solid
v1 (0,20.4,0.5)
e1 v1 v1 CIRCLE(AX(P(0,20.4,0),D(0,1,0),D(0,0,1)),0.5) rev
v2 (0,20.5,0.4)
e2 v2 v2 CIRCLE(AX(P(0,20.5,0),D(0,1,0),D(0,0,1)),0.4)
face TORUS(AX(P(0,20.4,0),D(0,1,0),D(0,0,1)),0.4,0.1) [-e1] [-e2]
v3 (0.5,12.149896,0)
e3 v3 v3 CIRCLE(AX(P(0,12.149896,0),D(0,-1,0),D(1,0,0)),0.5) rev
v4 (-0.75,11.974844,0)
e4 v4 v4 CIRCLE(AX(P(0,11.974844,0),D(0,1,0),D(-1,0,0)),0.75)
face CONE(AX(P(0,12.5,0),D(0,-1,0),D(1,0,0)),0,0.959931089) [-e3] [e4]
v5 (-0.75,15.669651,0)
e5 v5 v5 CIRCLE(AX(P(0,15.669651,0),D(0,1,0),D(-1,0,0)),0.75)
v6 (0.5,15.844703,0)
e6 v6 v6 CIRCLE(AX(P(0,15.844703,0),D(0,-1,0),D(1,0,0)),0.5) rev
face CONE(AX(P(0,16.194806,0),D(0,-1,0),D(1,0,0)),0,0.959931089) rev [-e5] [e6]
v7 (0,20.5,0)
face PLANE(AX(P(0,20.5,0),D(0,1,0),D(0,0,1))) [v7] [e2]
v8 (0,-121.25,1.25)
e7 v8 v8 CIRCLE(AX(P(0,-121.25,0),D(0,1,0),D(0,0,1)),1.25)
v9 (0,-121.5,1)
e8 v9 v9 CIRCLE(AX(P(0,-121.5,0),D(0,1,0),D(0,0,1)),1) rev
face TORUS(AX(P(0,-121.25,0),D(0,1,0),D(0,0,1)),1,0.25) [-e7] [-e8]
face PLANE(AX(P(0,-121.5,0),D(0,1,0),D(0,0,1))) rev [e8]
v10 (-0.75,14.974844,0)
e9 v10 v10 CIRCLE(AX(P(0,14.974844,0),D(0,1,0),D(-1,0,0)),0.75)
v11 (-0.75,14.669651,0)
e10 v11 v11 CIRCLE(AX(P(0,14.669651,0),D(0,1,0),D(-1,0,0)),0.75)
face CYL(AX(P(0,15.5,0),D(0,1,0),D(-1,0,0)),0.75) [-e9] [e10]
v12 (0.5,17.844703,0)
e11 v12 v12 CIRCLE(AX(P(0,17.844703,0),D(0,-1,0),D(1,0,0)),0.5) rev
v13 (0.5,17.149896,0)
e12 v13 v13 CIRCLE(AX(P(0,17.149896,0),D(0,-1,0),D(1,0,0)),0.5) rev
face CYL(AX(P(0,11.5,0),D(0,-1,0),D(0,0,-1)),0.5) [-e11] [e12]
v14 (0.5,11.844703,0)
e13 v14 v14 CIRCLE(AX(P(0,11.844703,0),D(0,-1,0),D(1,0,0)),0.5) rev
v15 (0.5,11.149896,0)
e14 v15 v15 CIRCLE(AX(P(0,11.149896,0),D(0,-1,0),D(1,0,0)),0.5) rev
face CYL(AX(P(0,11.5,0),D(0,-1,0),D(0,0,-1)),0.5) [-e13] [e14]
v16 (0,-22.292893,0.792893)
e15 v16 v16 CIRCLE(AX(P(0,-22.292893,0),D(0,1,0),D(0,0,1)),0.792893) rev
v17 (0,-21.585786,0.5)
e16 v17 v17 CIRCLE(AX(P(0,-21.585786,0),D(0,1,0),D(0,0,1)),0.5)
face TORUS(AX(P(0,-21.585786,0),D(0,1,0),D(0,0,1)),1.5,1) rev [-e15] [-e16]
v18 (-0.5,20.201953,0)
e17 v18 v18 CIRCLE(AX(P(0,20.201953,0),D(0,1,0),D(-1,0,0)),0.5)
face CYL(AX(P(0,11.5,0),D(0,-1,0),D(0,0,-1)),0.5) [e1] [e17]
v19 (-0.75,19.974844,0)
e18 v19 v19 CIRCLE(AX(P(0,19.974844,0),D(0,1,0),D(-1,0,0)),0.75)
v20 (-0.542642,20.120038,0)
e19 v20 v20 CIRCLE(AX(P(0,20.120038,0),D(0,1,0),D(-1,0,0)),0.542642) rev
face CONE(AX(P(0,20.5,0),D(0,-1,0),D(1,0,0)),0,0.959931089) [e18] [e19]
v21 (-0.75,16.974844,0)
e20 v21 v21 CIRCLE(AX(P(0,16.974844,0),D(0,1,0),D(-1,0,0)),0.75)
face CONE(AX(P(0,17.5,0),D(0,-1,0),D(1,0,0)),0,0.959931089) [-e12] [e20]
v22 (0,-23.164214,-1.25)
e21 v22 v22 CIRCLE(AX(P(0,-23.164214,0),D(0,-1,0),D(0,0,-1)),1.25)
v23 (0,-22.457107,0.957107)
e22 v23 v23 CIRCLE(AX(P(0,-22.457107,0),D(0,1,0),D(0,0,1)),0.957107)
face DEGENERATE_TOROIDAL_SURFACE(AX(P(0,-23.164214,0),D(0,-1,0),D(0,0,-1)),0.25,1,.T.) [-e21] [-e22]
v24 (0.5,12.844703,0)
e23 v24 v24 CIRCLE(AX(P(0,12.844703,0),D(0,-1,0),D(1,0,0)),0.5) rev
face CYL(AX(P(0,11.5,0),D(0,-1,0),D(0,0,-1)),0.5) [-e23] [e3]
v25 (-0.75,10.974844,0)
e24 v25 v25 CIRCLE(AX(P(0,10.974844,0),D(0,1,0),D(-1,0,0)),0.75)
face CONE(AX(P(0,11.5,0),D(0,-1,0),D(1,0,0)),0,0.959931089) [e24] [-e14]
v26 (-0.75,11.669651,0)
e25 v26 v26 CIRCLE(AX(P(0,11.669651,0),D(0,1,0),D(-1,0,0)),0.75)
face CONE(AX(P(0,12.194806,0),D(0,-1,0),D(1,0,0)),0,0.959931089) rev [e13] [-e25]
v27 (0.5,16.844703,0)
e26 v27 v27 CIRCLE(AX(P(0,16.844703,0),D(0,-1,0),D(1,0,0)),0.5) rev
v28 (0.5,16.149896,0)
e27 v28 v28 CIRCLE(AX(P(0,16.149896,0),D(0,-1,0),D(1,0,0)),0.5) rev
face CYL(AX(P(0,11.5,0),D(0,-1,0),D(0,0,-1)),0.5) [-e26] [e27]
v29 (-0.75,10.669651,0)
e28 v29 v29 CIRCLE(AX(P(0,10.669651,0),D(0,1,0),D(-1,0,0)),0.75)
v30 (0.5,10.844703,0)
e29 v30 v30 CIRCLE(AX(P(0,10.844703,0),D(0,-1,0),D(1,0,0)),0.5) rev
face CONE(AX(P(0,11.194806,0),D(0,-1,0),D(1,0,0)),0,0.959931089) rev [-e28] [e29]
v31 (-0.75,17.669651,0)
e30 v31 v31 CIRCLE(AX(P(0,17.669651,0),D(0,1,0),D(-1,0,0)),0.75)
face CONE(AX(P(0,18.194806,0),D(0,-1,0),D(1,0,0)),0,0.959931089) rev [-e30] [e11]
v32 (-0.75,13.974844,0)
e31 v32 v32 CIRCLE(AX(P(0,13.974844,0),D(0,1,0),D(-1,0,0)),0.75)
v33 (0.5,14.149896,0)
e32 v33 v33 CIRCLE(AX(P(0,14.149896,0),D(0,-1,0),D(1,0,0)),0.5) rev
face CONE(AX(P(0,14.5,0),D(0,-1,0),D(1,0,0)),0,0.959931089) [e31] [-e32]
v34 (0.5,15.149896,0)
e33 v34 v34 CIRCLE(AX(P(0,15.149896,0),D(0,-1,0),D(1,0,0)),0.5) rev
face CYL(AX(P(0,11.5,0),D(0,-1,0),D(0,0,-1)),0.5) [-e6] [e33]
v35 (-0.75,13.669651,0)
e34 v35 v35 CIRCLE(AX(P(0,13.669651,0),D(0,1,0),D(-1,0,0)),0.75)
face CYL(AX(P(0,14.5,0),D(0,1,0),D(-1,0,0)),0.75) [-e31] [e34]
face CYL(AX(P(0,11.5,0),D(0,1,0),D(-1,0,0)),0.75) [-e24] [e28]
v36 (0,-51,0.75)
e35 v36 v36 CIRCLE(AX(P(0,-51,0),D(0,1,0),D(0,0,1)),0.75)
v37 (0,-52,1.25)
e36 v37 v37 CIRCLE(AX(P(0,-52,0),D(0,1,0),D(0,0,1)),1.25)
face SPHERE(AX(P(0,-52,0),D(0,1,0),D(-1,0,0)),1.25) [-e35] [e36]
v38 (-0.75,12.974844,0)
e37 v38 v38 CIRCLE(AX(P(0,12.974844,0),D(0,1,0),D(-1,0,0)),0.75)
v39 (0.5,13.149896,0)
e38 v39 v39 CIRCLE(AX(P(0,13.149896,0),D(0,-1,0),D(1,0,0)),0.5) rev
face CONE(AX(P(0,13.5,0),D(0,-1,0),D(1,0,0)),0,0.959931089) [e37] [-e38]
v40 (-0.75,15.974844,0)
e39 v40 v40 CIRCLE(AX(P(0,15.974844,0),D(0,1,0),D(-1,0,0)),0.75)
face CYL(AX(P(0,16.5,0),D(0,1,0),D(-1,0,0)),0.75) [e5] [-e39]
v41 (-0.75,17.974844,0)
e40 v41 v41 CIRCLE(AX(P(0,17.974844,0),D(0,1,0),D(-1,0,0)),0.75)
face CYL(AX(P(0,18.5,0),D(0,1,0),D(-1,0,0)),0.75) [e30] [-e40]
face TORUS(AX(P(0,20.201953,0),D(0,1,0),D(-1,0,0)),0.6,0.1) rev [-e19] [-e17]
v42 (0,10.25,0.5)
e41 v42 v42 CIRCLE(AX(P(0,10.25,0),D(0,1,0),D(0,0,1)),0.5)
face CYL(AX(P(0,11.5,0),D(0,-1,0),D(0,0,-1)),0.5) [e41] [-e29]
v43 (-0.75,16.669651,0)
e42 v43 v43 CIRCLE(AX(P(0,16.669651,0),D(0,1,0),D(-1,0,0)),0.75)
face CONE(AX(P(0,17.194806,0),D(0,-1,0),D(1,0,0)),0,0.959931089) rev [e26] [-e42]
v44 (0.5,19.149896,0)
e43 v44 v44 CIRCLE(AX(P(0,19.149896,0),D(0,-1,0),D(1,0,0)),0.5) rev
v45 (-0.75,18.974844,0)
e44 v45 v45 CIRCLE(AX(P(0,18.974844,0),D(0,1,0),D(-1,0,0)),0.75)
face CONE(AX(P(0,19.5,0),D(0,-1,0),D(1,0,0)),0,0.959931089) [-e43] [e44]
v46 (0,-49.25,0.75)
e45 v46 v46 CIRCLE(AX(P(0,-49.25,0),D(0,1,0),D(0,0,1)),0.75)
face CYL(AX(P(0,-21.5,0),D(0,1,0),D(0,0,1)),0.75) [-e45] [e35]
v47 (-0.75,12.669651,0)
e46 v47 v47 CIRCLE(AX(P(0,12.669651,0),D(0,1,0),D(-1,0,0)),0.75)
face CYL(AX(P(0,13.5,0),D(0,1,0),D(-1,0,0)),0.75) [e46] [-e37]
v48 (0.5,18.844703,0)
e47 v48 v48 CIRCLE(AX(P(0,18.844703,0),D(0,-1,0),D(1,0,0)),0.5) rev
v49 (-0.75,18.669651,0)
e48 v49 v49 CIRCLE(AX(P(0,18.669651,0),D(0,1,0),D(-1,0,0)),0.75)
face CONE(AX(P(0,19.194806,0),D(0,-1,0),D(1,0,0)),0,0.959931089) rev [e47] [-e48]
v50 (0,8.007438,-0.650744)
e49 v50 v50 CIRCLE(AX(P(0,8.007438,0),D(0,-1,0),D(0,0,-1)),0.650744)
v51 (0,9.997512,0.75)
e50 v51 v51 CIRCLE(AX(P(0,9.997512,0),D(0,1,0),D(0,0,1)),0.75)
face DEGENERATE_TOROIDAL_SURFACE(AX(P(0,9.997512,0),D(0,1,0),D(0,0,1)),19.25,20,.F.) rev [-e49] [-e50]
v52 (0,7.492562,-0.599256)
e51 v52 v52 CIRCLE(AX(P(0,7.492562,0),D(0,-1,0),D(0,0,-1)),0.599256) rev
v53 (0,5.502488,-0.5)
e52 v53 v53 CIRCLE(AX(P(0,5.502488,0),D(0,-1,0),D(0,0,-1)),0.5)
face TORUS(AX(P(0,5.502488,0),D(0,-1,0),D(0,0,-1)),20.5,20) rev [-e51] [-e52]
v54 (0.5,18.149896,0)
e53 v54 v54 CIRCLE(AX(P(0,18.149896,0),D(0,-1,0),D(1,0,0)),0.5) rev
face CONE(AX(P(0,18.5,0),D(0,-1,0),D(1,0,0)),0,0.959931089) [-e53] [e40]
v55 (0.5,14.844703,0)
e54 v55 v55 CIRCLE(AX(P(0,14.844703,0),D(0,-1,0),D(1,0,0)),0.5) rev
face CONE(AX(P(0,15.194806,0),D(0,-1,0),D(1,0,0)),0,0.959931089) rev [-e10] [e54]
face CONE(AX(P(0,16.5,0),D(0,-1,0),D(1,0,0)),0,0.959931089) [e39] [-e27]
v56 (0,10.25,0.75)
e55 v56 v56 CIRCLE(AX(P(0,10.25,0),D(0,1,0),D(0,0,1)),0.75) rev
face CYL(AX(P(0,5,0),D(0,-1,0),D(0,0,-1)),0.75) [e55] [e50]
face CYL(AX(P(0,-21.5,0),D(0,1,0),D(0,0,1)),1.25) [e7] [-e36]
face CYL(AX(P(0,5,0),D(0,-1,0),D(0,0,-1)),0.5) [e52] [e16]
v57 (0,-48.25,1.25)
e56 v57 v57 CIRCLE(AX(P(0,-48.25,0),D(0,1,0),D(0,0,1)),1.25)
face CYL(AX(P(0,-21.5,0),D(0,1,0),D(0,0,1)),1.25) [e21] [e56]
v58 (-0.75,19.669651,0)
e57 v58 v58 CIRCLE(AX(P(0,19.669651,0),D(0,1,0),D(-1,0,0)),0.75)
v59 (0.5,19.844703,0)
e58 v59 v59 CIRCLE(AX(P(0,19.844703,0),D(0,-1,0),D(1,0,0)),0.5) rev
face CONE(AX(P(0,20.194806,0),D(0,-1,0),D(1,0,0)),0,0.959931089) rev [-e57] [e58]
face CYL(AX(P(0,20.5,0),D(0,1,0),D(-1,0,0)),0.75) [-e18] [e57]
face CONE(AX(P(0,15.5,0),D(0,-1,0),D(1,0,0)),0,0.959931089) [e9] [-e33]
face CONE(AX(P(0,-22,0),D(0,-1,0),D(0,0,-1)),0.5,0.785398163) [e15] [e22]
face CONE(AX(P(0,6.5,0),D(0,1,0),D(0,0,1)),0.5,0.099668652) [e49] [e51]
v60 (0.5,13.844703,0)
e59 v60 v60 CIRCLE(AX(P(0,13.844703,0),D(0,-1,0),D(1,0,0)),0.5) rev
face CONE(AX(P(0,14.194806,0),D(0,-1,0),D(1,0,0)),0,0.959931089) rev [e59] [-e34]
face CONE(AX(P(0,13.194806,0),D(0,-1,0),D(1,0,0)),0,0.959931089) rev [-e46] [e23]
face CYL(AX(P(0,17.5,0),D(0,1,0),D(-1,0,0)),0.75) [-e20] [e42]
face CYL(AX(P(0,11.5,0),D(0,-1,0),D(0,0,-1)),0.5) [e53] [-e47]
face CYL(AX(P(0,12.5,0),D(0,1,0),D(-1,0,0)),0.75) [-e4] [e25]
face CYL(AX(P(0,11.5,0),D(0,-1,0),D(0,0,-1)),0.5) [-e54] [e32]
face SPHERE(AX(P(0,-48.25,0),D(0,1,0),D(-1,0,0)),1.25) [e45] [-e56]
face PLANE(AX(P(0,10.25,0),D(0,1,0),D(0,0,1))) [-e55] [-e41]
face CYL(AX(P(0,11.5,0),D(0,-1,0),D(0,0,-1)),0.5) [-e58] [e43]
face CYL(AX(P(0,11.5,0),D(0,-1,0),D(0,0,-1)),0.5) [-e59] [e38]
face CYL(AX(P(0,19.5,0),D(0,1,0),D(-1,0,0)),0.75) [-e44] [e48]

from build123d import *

# Parameters (mm, degrees)
SKETCH2_R           = 0.5
BOSS_EXTRUDE1_DEPTH = 5
FILLET1_R           = 20
BOSS_EXTRUDE3_DEPTH = 1
MOVE_FACE1_BY       = 0.25
BOSS_EXTRUDE4_START = 21.5
SKETCH8_R           = 0.5
BOSS_EXTRUDE4_DEPTH = 21.5
FILLET6_R           = 0.25
FILLET7_R           = 1
LPATTERN1_COUNT     = 10
LPATTERN1_PITCH     = 1
FILLET8_R           = 0.1


with BuildPart() as part:
    # Sketch2 → Boss-Extrude1 (new body)
    with BuildSketch(Plane(origin=(0, 0, 0), x_dir=(1, 0, 0), z_dir=(0, 1, 0))):
        with Locations(Location((0, 0, 0), (0, 0, 270))):
            Circle(SKETCH2_R)
    extrude(amount=BOSS_EXTRUDE1_DEPTH)

    # Sketch4 → Revolve1 (revolve)
    with BuildSketch(Plane(origin=(0, 0, 0), x_dir=(0, 0, -1), z_dir=(1, 0, 0))):
        Polygon((0, 5.000000000000001), (0, 10.500000000000002), (0.75, 10.500000000000002), (0.7500000000000002, 9.000000000000002), (0.5, 6.500000000000001), (0.5, 5.000000000000001), align=None)
    revolve(axis=Axis((0, 5.000000000000001, 0), (0, 1, 0)))

    # Fillet1
    # the kernel refuses this fillet: 20 mm, written as the material it adds along each edge
    with BuildSketch(Plane(origin=(0, 6.500000000000001, 0), x_dir=(0, 0, -1), z_dir=(1, 0, 0))) as fillet1_piece_1:
        with BuildLine():
            CenterArc((0.5 + FILLET1_R, -FILLET1_R * 0.0498756211209), FILLET1_R, 174.28940686250036, 5.710593137499643)
            Line((0.5 + FILLET1_R * 0.00496280979001, FILLET1_R * 0.0496280979001), (0.5, 0))
            Line((0.5, 0), (0.5, -FILLET1_R * 0.0498756211209))
        make_face()
    revolve(axis=Axis((0, 6.500000000000001, 0), (0, 1, 0)))
    # the kernel refuses this fillet: 20 mm, written as the material it takes off along each edge
    with BuildSketch(Plane(origin=(0, 9.000000000000002, 0), x_dir=(0, 0, -1), z_dir=(1, 0, 0))) as fillet1_2_piece_1:
        with BuildLine():
            CenterArc((0.7500000000000002 - FILLET1_R, FILLET1_R * 0.0498756211209), FILLET1_R, 354.28940686250036, 5.710593137499647)
            Line((0.75, FILLET1_R * 0.0498756211209), (0.7500000000000002, 0))
            Line((0.7500000000000002, 0), (0.7500000000000002 - FILLET1_R * 0.00496280979001, -FILLET1_R * 0.0496280979001))
        make_face()
    revolve(axis=Axis((0, 9.000000000000002, 0), (0, 1, 0)), mode=Mode.SUBTRACT)

    # Sketch5 → Boss-Extrude3 (add)
    with BuildSketch(Plane(origin=(0, 10.500000000000002, 0), x_dir=(1, 0, 0), z_dir=(0, 1, 0))):
        with BuildLine():
            ThreePointArc((0.12499999999999366, 0.48412291827592874), (-1.329e-14, 0.5), (-0.1250000000000195, 0.4841229182759221))
            Line((-0.12500000000000006, 0.48412291827591764), (-0.12500000000000003, 0.125))
            Line((-0.125, 0.125), (0.125, 0.125))
            Line((0.12499999999999999, 0.125), (0.12499999999999994, 0.4841229182759302))
        make_face()
        with BuildLine():
            Line((0.48412291827592446, 0.125), (0.125, 0.125))
            Line((0.12499999999999999, 0.125), (0.12500000000000003, -0.125))
            Line((0.125, -0.125), (0.48412291827592446, -0.125))
            ThreePointArc((0.48412291827592574, -0.12500000000000536), (0.49601484813358304, -0.06300214624136663), (0.5, -1.2e-16))
            ThreePointArc((0.5, 0), (0.496014848133583, 0.06300214624136691), (0.4841229182759257, 0.12500000000000558))
        make_face()
        with BuildLine():
            ThreePointArc((0.4841229182759257, 0.12500000000000558), (0.3535533905932694, 0.35355339059327817), (0.12499999999999366, 0.48412291827592874))
            Line((0.12499999999999994, 0.4841229182759302), (0.12499999999999999, 0.125))
            Line((0.125, 0.125), (0.48412291827592446, 0.125))
        make_face()
        with BuildLine():
            Line((0.48412291827592446, -0.125), (0.125, -0.125))
            Line((0.12500000000000003, -0.125), (0.12500000000000006, -0.48412291827593024))
            ThreePointArc((0.12499999999999353, -0.4841229182759288), (0.3535533905932696, -0.3535533905932779), (0.48412291827592574, -0.12500000000000536))
        make_face()
        with BuildLine():
            Line((0.125, -0.125), (-0.125, -0.125))
            Line((-0.12499999999999999, -0.125), (-0.12499999999999994, -0.4841229182759178))
            ThreePointArc((-0.1250000000000195, -0.4841229182759221), (-1.341e-14, -0.5), (0.12499999999999353, -0.4841229182759288))
            Line((0.12500000000000006, -0.48412291827593024), (0.12500000000000003, -0.125))
        make_face()
        Polygon((0.125, 0.125), (-0.125, 0.125), (-0.12499999999999999, -0.125), (0.125, -0.125), align=None)
        with BuildLine():
            Line((-0.12499999999999999, -0.125), (-0.12500000000000003, 0.125))
            Line((-0.125, 0.125), (-0.48412291827591875, 0.125))
            ThreePointArc((-0.48412291827592263, 0.12500000000001735), (-0.5, 6e-17), (-0.4841229182759227, -0.1250000000000172))
            Line((-0.48412291827591875, -0.125), (-0.125, -0.125))
        make_face()
        with BuildLine():
            Line((-0.12500000000000003, 0.125), (-0.12500000000000006, 0.48412291827591764))
            ThreePointArc((-0.1250000000000195, 0.4841229182759221), (-0.3535533905932745, 0.353553390593273), (-0.48412291827592263, 0.12500000000001735))
            Line((-0.48412291827591875, 0.125), (-0.125, 0.125))
        make_face()
        with BuildLine():
            Line((-0.12499999999999994, -0.4841229182759178), (-0.12499999999999999, -0.125))
            Line((-0.125, -0.125), (-0.48412291827591875, -0.125))
            ThreePointArc((-0.4841229182759227, -0.1250000000000172), (-0.3535533905932746, -0.3535533905932729), (-0.1250000000000195, -0.4841229182759221))
        make_face()
    boss_extrude3 = extrude(amount=BOSS_EXTRUDE3_DEPTH)

    # Sketch10 → Revolve5 (revolve)
    with BuildSketch(Plane.XY):
        Polygon((0, 11.500000000000004), (0.7500000000000002, 10.974844346342728), (0.75, 10.669650699152365), (5e-17, 11.19480635280964), align=None)
    revolve5 = revolve(axis=Axis((0, 11.500000000000004, 0), (1.8e-16, -1, 0)))

    # Move Face1: a face moved inward by 0.25
    extrude(part.faces().sort_by_distance((0.6, 10.5, 0))[0], amount=MOVE_FACE1_BY, dir=(0, -1, 0), mode=Mode.SUBTRACT)

    # Sketch8 → Boss-Extrude4 (add)
    with BuildSketch(Plane(origin=(0, 0, 0), x_dir=(-1, 0, 0), z_dir=(0, -1, 0)).offset(BOSS_EXTRUDE4_START)):
        with Locations(Location((0, 0, 0), (0, 0, 180))):
            Circle(SKETCH8_R)
    extrude(amount=-BOSS_EXTRUDE4_DEPTH)

    # Sketch9 → Revolve4 (revolve)
    with BuildSketch(Plane.XY, mode=Mode.PRIVATE) as revolve4_sk:
        with BuildLine():
            Line((0, -21.5), (-0.5, -21.5))
            Line((-0.5, -21.5), (-0.4999999999999998, -22))
            Line((-0.4999999999999998, -22), (-1.2499999999999998, -22.75))
            Line((-1.2499999999999998, -22.75), (-1.2499999999999998, -23.25))
            Line((-1.2499999999999998, -23.25), (-1.2499999999999967, -48.25))
            ThreePointArc((-1.249999999999998, -48.25), (-1.1180339887498931, -48.80901699437494), (-0.7499999999999993, -49.24999999999999))
            Line((-0.7499999999999999, -49.24999999999999), (-0.7499999999999997, -51.00000000000001))
            ThreePointArc((-0.7499999999999996, -51.00000000000001), (-1.1180339887498953, -51.44098300562506), (-1.2499999999999964, -52.00000000000001))
            Line((-1.2499999999999964, -52.00000000000001), (-1.2499999999999876, -120.25))
            Line((-1.2499999999999876, -120.25000000000001), (-1.2499999999999878, -121.50000000000001))
            Line((-1.2499999999999878, -121.50000000000001), (0, -121.50000000000001))
            Line((0, -121.5), (0, -52.00000000000001))
            Line((4.6e-16, -52.00000000000001), (0, -48.25))
            Line((0, -48.25), (0, -21.5))
        make_face()
    revolve(revolve4_sk.sketch.rotate(Axis((0, -21.5, 0), (0, -1, 0)), 270), axis=Axis((0, -21.5, 0), (0, -1, 0)))

    # Fillet6
    fillet6_edges = [part.edges().sort_by_distance(p)[0] for p in [
        (-4.3e-16, -121.50000000000001, -1.2499999999999878),
    ]]
    fillet(fillet6_edges, radius=FILLET6_R)

    # Fillet7
    fillet7_edges = [part.edges().sort_by_distance(p)[0] for p in [
        (-1.7e-16, -22, -0.4999999999999998),
        (-4.3e-16, -22.75, -1.2499999999999998),
    ]]
    fillet(fillet7_edges, radius=FILLET7_R)

    # LPattern1: Boss-Extrude3, Revolve5 ×10
    with Locations(*[(0, i * LPATTERN1_PITCH, 0) for i in range(1, LPATTERN1_COUNT)]):
        add(boss_extrude3)
        add(revolve5)

    # Fillet8
    fillet8_edges = [part.edges().sort_by_distance(p)[0] for p in [
        (0.3061862178478884, 20.149896230895155, -0.39528470752105255),
        (0.125000000000012, 20.5, 0.48412291827592546),
    ]]
    fillet(fillet8_edges, radius=FILLET8_R)


solid = part.part
